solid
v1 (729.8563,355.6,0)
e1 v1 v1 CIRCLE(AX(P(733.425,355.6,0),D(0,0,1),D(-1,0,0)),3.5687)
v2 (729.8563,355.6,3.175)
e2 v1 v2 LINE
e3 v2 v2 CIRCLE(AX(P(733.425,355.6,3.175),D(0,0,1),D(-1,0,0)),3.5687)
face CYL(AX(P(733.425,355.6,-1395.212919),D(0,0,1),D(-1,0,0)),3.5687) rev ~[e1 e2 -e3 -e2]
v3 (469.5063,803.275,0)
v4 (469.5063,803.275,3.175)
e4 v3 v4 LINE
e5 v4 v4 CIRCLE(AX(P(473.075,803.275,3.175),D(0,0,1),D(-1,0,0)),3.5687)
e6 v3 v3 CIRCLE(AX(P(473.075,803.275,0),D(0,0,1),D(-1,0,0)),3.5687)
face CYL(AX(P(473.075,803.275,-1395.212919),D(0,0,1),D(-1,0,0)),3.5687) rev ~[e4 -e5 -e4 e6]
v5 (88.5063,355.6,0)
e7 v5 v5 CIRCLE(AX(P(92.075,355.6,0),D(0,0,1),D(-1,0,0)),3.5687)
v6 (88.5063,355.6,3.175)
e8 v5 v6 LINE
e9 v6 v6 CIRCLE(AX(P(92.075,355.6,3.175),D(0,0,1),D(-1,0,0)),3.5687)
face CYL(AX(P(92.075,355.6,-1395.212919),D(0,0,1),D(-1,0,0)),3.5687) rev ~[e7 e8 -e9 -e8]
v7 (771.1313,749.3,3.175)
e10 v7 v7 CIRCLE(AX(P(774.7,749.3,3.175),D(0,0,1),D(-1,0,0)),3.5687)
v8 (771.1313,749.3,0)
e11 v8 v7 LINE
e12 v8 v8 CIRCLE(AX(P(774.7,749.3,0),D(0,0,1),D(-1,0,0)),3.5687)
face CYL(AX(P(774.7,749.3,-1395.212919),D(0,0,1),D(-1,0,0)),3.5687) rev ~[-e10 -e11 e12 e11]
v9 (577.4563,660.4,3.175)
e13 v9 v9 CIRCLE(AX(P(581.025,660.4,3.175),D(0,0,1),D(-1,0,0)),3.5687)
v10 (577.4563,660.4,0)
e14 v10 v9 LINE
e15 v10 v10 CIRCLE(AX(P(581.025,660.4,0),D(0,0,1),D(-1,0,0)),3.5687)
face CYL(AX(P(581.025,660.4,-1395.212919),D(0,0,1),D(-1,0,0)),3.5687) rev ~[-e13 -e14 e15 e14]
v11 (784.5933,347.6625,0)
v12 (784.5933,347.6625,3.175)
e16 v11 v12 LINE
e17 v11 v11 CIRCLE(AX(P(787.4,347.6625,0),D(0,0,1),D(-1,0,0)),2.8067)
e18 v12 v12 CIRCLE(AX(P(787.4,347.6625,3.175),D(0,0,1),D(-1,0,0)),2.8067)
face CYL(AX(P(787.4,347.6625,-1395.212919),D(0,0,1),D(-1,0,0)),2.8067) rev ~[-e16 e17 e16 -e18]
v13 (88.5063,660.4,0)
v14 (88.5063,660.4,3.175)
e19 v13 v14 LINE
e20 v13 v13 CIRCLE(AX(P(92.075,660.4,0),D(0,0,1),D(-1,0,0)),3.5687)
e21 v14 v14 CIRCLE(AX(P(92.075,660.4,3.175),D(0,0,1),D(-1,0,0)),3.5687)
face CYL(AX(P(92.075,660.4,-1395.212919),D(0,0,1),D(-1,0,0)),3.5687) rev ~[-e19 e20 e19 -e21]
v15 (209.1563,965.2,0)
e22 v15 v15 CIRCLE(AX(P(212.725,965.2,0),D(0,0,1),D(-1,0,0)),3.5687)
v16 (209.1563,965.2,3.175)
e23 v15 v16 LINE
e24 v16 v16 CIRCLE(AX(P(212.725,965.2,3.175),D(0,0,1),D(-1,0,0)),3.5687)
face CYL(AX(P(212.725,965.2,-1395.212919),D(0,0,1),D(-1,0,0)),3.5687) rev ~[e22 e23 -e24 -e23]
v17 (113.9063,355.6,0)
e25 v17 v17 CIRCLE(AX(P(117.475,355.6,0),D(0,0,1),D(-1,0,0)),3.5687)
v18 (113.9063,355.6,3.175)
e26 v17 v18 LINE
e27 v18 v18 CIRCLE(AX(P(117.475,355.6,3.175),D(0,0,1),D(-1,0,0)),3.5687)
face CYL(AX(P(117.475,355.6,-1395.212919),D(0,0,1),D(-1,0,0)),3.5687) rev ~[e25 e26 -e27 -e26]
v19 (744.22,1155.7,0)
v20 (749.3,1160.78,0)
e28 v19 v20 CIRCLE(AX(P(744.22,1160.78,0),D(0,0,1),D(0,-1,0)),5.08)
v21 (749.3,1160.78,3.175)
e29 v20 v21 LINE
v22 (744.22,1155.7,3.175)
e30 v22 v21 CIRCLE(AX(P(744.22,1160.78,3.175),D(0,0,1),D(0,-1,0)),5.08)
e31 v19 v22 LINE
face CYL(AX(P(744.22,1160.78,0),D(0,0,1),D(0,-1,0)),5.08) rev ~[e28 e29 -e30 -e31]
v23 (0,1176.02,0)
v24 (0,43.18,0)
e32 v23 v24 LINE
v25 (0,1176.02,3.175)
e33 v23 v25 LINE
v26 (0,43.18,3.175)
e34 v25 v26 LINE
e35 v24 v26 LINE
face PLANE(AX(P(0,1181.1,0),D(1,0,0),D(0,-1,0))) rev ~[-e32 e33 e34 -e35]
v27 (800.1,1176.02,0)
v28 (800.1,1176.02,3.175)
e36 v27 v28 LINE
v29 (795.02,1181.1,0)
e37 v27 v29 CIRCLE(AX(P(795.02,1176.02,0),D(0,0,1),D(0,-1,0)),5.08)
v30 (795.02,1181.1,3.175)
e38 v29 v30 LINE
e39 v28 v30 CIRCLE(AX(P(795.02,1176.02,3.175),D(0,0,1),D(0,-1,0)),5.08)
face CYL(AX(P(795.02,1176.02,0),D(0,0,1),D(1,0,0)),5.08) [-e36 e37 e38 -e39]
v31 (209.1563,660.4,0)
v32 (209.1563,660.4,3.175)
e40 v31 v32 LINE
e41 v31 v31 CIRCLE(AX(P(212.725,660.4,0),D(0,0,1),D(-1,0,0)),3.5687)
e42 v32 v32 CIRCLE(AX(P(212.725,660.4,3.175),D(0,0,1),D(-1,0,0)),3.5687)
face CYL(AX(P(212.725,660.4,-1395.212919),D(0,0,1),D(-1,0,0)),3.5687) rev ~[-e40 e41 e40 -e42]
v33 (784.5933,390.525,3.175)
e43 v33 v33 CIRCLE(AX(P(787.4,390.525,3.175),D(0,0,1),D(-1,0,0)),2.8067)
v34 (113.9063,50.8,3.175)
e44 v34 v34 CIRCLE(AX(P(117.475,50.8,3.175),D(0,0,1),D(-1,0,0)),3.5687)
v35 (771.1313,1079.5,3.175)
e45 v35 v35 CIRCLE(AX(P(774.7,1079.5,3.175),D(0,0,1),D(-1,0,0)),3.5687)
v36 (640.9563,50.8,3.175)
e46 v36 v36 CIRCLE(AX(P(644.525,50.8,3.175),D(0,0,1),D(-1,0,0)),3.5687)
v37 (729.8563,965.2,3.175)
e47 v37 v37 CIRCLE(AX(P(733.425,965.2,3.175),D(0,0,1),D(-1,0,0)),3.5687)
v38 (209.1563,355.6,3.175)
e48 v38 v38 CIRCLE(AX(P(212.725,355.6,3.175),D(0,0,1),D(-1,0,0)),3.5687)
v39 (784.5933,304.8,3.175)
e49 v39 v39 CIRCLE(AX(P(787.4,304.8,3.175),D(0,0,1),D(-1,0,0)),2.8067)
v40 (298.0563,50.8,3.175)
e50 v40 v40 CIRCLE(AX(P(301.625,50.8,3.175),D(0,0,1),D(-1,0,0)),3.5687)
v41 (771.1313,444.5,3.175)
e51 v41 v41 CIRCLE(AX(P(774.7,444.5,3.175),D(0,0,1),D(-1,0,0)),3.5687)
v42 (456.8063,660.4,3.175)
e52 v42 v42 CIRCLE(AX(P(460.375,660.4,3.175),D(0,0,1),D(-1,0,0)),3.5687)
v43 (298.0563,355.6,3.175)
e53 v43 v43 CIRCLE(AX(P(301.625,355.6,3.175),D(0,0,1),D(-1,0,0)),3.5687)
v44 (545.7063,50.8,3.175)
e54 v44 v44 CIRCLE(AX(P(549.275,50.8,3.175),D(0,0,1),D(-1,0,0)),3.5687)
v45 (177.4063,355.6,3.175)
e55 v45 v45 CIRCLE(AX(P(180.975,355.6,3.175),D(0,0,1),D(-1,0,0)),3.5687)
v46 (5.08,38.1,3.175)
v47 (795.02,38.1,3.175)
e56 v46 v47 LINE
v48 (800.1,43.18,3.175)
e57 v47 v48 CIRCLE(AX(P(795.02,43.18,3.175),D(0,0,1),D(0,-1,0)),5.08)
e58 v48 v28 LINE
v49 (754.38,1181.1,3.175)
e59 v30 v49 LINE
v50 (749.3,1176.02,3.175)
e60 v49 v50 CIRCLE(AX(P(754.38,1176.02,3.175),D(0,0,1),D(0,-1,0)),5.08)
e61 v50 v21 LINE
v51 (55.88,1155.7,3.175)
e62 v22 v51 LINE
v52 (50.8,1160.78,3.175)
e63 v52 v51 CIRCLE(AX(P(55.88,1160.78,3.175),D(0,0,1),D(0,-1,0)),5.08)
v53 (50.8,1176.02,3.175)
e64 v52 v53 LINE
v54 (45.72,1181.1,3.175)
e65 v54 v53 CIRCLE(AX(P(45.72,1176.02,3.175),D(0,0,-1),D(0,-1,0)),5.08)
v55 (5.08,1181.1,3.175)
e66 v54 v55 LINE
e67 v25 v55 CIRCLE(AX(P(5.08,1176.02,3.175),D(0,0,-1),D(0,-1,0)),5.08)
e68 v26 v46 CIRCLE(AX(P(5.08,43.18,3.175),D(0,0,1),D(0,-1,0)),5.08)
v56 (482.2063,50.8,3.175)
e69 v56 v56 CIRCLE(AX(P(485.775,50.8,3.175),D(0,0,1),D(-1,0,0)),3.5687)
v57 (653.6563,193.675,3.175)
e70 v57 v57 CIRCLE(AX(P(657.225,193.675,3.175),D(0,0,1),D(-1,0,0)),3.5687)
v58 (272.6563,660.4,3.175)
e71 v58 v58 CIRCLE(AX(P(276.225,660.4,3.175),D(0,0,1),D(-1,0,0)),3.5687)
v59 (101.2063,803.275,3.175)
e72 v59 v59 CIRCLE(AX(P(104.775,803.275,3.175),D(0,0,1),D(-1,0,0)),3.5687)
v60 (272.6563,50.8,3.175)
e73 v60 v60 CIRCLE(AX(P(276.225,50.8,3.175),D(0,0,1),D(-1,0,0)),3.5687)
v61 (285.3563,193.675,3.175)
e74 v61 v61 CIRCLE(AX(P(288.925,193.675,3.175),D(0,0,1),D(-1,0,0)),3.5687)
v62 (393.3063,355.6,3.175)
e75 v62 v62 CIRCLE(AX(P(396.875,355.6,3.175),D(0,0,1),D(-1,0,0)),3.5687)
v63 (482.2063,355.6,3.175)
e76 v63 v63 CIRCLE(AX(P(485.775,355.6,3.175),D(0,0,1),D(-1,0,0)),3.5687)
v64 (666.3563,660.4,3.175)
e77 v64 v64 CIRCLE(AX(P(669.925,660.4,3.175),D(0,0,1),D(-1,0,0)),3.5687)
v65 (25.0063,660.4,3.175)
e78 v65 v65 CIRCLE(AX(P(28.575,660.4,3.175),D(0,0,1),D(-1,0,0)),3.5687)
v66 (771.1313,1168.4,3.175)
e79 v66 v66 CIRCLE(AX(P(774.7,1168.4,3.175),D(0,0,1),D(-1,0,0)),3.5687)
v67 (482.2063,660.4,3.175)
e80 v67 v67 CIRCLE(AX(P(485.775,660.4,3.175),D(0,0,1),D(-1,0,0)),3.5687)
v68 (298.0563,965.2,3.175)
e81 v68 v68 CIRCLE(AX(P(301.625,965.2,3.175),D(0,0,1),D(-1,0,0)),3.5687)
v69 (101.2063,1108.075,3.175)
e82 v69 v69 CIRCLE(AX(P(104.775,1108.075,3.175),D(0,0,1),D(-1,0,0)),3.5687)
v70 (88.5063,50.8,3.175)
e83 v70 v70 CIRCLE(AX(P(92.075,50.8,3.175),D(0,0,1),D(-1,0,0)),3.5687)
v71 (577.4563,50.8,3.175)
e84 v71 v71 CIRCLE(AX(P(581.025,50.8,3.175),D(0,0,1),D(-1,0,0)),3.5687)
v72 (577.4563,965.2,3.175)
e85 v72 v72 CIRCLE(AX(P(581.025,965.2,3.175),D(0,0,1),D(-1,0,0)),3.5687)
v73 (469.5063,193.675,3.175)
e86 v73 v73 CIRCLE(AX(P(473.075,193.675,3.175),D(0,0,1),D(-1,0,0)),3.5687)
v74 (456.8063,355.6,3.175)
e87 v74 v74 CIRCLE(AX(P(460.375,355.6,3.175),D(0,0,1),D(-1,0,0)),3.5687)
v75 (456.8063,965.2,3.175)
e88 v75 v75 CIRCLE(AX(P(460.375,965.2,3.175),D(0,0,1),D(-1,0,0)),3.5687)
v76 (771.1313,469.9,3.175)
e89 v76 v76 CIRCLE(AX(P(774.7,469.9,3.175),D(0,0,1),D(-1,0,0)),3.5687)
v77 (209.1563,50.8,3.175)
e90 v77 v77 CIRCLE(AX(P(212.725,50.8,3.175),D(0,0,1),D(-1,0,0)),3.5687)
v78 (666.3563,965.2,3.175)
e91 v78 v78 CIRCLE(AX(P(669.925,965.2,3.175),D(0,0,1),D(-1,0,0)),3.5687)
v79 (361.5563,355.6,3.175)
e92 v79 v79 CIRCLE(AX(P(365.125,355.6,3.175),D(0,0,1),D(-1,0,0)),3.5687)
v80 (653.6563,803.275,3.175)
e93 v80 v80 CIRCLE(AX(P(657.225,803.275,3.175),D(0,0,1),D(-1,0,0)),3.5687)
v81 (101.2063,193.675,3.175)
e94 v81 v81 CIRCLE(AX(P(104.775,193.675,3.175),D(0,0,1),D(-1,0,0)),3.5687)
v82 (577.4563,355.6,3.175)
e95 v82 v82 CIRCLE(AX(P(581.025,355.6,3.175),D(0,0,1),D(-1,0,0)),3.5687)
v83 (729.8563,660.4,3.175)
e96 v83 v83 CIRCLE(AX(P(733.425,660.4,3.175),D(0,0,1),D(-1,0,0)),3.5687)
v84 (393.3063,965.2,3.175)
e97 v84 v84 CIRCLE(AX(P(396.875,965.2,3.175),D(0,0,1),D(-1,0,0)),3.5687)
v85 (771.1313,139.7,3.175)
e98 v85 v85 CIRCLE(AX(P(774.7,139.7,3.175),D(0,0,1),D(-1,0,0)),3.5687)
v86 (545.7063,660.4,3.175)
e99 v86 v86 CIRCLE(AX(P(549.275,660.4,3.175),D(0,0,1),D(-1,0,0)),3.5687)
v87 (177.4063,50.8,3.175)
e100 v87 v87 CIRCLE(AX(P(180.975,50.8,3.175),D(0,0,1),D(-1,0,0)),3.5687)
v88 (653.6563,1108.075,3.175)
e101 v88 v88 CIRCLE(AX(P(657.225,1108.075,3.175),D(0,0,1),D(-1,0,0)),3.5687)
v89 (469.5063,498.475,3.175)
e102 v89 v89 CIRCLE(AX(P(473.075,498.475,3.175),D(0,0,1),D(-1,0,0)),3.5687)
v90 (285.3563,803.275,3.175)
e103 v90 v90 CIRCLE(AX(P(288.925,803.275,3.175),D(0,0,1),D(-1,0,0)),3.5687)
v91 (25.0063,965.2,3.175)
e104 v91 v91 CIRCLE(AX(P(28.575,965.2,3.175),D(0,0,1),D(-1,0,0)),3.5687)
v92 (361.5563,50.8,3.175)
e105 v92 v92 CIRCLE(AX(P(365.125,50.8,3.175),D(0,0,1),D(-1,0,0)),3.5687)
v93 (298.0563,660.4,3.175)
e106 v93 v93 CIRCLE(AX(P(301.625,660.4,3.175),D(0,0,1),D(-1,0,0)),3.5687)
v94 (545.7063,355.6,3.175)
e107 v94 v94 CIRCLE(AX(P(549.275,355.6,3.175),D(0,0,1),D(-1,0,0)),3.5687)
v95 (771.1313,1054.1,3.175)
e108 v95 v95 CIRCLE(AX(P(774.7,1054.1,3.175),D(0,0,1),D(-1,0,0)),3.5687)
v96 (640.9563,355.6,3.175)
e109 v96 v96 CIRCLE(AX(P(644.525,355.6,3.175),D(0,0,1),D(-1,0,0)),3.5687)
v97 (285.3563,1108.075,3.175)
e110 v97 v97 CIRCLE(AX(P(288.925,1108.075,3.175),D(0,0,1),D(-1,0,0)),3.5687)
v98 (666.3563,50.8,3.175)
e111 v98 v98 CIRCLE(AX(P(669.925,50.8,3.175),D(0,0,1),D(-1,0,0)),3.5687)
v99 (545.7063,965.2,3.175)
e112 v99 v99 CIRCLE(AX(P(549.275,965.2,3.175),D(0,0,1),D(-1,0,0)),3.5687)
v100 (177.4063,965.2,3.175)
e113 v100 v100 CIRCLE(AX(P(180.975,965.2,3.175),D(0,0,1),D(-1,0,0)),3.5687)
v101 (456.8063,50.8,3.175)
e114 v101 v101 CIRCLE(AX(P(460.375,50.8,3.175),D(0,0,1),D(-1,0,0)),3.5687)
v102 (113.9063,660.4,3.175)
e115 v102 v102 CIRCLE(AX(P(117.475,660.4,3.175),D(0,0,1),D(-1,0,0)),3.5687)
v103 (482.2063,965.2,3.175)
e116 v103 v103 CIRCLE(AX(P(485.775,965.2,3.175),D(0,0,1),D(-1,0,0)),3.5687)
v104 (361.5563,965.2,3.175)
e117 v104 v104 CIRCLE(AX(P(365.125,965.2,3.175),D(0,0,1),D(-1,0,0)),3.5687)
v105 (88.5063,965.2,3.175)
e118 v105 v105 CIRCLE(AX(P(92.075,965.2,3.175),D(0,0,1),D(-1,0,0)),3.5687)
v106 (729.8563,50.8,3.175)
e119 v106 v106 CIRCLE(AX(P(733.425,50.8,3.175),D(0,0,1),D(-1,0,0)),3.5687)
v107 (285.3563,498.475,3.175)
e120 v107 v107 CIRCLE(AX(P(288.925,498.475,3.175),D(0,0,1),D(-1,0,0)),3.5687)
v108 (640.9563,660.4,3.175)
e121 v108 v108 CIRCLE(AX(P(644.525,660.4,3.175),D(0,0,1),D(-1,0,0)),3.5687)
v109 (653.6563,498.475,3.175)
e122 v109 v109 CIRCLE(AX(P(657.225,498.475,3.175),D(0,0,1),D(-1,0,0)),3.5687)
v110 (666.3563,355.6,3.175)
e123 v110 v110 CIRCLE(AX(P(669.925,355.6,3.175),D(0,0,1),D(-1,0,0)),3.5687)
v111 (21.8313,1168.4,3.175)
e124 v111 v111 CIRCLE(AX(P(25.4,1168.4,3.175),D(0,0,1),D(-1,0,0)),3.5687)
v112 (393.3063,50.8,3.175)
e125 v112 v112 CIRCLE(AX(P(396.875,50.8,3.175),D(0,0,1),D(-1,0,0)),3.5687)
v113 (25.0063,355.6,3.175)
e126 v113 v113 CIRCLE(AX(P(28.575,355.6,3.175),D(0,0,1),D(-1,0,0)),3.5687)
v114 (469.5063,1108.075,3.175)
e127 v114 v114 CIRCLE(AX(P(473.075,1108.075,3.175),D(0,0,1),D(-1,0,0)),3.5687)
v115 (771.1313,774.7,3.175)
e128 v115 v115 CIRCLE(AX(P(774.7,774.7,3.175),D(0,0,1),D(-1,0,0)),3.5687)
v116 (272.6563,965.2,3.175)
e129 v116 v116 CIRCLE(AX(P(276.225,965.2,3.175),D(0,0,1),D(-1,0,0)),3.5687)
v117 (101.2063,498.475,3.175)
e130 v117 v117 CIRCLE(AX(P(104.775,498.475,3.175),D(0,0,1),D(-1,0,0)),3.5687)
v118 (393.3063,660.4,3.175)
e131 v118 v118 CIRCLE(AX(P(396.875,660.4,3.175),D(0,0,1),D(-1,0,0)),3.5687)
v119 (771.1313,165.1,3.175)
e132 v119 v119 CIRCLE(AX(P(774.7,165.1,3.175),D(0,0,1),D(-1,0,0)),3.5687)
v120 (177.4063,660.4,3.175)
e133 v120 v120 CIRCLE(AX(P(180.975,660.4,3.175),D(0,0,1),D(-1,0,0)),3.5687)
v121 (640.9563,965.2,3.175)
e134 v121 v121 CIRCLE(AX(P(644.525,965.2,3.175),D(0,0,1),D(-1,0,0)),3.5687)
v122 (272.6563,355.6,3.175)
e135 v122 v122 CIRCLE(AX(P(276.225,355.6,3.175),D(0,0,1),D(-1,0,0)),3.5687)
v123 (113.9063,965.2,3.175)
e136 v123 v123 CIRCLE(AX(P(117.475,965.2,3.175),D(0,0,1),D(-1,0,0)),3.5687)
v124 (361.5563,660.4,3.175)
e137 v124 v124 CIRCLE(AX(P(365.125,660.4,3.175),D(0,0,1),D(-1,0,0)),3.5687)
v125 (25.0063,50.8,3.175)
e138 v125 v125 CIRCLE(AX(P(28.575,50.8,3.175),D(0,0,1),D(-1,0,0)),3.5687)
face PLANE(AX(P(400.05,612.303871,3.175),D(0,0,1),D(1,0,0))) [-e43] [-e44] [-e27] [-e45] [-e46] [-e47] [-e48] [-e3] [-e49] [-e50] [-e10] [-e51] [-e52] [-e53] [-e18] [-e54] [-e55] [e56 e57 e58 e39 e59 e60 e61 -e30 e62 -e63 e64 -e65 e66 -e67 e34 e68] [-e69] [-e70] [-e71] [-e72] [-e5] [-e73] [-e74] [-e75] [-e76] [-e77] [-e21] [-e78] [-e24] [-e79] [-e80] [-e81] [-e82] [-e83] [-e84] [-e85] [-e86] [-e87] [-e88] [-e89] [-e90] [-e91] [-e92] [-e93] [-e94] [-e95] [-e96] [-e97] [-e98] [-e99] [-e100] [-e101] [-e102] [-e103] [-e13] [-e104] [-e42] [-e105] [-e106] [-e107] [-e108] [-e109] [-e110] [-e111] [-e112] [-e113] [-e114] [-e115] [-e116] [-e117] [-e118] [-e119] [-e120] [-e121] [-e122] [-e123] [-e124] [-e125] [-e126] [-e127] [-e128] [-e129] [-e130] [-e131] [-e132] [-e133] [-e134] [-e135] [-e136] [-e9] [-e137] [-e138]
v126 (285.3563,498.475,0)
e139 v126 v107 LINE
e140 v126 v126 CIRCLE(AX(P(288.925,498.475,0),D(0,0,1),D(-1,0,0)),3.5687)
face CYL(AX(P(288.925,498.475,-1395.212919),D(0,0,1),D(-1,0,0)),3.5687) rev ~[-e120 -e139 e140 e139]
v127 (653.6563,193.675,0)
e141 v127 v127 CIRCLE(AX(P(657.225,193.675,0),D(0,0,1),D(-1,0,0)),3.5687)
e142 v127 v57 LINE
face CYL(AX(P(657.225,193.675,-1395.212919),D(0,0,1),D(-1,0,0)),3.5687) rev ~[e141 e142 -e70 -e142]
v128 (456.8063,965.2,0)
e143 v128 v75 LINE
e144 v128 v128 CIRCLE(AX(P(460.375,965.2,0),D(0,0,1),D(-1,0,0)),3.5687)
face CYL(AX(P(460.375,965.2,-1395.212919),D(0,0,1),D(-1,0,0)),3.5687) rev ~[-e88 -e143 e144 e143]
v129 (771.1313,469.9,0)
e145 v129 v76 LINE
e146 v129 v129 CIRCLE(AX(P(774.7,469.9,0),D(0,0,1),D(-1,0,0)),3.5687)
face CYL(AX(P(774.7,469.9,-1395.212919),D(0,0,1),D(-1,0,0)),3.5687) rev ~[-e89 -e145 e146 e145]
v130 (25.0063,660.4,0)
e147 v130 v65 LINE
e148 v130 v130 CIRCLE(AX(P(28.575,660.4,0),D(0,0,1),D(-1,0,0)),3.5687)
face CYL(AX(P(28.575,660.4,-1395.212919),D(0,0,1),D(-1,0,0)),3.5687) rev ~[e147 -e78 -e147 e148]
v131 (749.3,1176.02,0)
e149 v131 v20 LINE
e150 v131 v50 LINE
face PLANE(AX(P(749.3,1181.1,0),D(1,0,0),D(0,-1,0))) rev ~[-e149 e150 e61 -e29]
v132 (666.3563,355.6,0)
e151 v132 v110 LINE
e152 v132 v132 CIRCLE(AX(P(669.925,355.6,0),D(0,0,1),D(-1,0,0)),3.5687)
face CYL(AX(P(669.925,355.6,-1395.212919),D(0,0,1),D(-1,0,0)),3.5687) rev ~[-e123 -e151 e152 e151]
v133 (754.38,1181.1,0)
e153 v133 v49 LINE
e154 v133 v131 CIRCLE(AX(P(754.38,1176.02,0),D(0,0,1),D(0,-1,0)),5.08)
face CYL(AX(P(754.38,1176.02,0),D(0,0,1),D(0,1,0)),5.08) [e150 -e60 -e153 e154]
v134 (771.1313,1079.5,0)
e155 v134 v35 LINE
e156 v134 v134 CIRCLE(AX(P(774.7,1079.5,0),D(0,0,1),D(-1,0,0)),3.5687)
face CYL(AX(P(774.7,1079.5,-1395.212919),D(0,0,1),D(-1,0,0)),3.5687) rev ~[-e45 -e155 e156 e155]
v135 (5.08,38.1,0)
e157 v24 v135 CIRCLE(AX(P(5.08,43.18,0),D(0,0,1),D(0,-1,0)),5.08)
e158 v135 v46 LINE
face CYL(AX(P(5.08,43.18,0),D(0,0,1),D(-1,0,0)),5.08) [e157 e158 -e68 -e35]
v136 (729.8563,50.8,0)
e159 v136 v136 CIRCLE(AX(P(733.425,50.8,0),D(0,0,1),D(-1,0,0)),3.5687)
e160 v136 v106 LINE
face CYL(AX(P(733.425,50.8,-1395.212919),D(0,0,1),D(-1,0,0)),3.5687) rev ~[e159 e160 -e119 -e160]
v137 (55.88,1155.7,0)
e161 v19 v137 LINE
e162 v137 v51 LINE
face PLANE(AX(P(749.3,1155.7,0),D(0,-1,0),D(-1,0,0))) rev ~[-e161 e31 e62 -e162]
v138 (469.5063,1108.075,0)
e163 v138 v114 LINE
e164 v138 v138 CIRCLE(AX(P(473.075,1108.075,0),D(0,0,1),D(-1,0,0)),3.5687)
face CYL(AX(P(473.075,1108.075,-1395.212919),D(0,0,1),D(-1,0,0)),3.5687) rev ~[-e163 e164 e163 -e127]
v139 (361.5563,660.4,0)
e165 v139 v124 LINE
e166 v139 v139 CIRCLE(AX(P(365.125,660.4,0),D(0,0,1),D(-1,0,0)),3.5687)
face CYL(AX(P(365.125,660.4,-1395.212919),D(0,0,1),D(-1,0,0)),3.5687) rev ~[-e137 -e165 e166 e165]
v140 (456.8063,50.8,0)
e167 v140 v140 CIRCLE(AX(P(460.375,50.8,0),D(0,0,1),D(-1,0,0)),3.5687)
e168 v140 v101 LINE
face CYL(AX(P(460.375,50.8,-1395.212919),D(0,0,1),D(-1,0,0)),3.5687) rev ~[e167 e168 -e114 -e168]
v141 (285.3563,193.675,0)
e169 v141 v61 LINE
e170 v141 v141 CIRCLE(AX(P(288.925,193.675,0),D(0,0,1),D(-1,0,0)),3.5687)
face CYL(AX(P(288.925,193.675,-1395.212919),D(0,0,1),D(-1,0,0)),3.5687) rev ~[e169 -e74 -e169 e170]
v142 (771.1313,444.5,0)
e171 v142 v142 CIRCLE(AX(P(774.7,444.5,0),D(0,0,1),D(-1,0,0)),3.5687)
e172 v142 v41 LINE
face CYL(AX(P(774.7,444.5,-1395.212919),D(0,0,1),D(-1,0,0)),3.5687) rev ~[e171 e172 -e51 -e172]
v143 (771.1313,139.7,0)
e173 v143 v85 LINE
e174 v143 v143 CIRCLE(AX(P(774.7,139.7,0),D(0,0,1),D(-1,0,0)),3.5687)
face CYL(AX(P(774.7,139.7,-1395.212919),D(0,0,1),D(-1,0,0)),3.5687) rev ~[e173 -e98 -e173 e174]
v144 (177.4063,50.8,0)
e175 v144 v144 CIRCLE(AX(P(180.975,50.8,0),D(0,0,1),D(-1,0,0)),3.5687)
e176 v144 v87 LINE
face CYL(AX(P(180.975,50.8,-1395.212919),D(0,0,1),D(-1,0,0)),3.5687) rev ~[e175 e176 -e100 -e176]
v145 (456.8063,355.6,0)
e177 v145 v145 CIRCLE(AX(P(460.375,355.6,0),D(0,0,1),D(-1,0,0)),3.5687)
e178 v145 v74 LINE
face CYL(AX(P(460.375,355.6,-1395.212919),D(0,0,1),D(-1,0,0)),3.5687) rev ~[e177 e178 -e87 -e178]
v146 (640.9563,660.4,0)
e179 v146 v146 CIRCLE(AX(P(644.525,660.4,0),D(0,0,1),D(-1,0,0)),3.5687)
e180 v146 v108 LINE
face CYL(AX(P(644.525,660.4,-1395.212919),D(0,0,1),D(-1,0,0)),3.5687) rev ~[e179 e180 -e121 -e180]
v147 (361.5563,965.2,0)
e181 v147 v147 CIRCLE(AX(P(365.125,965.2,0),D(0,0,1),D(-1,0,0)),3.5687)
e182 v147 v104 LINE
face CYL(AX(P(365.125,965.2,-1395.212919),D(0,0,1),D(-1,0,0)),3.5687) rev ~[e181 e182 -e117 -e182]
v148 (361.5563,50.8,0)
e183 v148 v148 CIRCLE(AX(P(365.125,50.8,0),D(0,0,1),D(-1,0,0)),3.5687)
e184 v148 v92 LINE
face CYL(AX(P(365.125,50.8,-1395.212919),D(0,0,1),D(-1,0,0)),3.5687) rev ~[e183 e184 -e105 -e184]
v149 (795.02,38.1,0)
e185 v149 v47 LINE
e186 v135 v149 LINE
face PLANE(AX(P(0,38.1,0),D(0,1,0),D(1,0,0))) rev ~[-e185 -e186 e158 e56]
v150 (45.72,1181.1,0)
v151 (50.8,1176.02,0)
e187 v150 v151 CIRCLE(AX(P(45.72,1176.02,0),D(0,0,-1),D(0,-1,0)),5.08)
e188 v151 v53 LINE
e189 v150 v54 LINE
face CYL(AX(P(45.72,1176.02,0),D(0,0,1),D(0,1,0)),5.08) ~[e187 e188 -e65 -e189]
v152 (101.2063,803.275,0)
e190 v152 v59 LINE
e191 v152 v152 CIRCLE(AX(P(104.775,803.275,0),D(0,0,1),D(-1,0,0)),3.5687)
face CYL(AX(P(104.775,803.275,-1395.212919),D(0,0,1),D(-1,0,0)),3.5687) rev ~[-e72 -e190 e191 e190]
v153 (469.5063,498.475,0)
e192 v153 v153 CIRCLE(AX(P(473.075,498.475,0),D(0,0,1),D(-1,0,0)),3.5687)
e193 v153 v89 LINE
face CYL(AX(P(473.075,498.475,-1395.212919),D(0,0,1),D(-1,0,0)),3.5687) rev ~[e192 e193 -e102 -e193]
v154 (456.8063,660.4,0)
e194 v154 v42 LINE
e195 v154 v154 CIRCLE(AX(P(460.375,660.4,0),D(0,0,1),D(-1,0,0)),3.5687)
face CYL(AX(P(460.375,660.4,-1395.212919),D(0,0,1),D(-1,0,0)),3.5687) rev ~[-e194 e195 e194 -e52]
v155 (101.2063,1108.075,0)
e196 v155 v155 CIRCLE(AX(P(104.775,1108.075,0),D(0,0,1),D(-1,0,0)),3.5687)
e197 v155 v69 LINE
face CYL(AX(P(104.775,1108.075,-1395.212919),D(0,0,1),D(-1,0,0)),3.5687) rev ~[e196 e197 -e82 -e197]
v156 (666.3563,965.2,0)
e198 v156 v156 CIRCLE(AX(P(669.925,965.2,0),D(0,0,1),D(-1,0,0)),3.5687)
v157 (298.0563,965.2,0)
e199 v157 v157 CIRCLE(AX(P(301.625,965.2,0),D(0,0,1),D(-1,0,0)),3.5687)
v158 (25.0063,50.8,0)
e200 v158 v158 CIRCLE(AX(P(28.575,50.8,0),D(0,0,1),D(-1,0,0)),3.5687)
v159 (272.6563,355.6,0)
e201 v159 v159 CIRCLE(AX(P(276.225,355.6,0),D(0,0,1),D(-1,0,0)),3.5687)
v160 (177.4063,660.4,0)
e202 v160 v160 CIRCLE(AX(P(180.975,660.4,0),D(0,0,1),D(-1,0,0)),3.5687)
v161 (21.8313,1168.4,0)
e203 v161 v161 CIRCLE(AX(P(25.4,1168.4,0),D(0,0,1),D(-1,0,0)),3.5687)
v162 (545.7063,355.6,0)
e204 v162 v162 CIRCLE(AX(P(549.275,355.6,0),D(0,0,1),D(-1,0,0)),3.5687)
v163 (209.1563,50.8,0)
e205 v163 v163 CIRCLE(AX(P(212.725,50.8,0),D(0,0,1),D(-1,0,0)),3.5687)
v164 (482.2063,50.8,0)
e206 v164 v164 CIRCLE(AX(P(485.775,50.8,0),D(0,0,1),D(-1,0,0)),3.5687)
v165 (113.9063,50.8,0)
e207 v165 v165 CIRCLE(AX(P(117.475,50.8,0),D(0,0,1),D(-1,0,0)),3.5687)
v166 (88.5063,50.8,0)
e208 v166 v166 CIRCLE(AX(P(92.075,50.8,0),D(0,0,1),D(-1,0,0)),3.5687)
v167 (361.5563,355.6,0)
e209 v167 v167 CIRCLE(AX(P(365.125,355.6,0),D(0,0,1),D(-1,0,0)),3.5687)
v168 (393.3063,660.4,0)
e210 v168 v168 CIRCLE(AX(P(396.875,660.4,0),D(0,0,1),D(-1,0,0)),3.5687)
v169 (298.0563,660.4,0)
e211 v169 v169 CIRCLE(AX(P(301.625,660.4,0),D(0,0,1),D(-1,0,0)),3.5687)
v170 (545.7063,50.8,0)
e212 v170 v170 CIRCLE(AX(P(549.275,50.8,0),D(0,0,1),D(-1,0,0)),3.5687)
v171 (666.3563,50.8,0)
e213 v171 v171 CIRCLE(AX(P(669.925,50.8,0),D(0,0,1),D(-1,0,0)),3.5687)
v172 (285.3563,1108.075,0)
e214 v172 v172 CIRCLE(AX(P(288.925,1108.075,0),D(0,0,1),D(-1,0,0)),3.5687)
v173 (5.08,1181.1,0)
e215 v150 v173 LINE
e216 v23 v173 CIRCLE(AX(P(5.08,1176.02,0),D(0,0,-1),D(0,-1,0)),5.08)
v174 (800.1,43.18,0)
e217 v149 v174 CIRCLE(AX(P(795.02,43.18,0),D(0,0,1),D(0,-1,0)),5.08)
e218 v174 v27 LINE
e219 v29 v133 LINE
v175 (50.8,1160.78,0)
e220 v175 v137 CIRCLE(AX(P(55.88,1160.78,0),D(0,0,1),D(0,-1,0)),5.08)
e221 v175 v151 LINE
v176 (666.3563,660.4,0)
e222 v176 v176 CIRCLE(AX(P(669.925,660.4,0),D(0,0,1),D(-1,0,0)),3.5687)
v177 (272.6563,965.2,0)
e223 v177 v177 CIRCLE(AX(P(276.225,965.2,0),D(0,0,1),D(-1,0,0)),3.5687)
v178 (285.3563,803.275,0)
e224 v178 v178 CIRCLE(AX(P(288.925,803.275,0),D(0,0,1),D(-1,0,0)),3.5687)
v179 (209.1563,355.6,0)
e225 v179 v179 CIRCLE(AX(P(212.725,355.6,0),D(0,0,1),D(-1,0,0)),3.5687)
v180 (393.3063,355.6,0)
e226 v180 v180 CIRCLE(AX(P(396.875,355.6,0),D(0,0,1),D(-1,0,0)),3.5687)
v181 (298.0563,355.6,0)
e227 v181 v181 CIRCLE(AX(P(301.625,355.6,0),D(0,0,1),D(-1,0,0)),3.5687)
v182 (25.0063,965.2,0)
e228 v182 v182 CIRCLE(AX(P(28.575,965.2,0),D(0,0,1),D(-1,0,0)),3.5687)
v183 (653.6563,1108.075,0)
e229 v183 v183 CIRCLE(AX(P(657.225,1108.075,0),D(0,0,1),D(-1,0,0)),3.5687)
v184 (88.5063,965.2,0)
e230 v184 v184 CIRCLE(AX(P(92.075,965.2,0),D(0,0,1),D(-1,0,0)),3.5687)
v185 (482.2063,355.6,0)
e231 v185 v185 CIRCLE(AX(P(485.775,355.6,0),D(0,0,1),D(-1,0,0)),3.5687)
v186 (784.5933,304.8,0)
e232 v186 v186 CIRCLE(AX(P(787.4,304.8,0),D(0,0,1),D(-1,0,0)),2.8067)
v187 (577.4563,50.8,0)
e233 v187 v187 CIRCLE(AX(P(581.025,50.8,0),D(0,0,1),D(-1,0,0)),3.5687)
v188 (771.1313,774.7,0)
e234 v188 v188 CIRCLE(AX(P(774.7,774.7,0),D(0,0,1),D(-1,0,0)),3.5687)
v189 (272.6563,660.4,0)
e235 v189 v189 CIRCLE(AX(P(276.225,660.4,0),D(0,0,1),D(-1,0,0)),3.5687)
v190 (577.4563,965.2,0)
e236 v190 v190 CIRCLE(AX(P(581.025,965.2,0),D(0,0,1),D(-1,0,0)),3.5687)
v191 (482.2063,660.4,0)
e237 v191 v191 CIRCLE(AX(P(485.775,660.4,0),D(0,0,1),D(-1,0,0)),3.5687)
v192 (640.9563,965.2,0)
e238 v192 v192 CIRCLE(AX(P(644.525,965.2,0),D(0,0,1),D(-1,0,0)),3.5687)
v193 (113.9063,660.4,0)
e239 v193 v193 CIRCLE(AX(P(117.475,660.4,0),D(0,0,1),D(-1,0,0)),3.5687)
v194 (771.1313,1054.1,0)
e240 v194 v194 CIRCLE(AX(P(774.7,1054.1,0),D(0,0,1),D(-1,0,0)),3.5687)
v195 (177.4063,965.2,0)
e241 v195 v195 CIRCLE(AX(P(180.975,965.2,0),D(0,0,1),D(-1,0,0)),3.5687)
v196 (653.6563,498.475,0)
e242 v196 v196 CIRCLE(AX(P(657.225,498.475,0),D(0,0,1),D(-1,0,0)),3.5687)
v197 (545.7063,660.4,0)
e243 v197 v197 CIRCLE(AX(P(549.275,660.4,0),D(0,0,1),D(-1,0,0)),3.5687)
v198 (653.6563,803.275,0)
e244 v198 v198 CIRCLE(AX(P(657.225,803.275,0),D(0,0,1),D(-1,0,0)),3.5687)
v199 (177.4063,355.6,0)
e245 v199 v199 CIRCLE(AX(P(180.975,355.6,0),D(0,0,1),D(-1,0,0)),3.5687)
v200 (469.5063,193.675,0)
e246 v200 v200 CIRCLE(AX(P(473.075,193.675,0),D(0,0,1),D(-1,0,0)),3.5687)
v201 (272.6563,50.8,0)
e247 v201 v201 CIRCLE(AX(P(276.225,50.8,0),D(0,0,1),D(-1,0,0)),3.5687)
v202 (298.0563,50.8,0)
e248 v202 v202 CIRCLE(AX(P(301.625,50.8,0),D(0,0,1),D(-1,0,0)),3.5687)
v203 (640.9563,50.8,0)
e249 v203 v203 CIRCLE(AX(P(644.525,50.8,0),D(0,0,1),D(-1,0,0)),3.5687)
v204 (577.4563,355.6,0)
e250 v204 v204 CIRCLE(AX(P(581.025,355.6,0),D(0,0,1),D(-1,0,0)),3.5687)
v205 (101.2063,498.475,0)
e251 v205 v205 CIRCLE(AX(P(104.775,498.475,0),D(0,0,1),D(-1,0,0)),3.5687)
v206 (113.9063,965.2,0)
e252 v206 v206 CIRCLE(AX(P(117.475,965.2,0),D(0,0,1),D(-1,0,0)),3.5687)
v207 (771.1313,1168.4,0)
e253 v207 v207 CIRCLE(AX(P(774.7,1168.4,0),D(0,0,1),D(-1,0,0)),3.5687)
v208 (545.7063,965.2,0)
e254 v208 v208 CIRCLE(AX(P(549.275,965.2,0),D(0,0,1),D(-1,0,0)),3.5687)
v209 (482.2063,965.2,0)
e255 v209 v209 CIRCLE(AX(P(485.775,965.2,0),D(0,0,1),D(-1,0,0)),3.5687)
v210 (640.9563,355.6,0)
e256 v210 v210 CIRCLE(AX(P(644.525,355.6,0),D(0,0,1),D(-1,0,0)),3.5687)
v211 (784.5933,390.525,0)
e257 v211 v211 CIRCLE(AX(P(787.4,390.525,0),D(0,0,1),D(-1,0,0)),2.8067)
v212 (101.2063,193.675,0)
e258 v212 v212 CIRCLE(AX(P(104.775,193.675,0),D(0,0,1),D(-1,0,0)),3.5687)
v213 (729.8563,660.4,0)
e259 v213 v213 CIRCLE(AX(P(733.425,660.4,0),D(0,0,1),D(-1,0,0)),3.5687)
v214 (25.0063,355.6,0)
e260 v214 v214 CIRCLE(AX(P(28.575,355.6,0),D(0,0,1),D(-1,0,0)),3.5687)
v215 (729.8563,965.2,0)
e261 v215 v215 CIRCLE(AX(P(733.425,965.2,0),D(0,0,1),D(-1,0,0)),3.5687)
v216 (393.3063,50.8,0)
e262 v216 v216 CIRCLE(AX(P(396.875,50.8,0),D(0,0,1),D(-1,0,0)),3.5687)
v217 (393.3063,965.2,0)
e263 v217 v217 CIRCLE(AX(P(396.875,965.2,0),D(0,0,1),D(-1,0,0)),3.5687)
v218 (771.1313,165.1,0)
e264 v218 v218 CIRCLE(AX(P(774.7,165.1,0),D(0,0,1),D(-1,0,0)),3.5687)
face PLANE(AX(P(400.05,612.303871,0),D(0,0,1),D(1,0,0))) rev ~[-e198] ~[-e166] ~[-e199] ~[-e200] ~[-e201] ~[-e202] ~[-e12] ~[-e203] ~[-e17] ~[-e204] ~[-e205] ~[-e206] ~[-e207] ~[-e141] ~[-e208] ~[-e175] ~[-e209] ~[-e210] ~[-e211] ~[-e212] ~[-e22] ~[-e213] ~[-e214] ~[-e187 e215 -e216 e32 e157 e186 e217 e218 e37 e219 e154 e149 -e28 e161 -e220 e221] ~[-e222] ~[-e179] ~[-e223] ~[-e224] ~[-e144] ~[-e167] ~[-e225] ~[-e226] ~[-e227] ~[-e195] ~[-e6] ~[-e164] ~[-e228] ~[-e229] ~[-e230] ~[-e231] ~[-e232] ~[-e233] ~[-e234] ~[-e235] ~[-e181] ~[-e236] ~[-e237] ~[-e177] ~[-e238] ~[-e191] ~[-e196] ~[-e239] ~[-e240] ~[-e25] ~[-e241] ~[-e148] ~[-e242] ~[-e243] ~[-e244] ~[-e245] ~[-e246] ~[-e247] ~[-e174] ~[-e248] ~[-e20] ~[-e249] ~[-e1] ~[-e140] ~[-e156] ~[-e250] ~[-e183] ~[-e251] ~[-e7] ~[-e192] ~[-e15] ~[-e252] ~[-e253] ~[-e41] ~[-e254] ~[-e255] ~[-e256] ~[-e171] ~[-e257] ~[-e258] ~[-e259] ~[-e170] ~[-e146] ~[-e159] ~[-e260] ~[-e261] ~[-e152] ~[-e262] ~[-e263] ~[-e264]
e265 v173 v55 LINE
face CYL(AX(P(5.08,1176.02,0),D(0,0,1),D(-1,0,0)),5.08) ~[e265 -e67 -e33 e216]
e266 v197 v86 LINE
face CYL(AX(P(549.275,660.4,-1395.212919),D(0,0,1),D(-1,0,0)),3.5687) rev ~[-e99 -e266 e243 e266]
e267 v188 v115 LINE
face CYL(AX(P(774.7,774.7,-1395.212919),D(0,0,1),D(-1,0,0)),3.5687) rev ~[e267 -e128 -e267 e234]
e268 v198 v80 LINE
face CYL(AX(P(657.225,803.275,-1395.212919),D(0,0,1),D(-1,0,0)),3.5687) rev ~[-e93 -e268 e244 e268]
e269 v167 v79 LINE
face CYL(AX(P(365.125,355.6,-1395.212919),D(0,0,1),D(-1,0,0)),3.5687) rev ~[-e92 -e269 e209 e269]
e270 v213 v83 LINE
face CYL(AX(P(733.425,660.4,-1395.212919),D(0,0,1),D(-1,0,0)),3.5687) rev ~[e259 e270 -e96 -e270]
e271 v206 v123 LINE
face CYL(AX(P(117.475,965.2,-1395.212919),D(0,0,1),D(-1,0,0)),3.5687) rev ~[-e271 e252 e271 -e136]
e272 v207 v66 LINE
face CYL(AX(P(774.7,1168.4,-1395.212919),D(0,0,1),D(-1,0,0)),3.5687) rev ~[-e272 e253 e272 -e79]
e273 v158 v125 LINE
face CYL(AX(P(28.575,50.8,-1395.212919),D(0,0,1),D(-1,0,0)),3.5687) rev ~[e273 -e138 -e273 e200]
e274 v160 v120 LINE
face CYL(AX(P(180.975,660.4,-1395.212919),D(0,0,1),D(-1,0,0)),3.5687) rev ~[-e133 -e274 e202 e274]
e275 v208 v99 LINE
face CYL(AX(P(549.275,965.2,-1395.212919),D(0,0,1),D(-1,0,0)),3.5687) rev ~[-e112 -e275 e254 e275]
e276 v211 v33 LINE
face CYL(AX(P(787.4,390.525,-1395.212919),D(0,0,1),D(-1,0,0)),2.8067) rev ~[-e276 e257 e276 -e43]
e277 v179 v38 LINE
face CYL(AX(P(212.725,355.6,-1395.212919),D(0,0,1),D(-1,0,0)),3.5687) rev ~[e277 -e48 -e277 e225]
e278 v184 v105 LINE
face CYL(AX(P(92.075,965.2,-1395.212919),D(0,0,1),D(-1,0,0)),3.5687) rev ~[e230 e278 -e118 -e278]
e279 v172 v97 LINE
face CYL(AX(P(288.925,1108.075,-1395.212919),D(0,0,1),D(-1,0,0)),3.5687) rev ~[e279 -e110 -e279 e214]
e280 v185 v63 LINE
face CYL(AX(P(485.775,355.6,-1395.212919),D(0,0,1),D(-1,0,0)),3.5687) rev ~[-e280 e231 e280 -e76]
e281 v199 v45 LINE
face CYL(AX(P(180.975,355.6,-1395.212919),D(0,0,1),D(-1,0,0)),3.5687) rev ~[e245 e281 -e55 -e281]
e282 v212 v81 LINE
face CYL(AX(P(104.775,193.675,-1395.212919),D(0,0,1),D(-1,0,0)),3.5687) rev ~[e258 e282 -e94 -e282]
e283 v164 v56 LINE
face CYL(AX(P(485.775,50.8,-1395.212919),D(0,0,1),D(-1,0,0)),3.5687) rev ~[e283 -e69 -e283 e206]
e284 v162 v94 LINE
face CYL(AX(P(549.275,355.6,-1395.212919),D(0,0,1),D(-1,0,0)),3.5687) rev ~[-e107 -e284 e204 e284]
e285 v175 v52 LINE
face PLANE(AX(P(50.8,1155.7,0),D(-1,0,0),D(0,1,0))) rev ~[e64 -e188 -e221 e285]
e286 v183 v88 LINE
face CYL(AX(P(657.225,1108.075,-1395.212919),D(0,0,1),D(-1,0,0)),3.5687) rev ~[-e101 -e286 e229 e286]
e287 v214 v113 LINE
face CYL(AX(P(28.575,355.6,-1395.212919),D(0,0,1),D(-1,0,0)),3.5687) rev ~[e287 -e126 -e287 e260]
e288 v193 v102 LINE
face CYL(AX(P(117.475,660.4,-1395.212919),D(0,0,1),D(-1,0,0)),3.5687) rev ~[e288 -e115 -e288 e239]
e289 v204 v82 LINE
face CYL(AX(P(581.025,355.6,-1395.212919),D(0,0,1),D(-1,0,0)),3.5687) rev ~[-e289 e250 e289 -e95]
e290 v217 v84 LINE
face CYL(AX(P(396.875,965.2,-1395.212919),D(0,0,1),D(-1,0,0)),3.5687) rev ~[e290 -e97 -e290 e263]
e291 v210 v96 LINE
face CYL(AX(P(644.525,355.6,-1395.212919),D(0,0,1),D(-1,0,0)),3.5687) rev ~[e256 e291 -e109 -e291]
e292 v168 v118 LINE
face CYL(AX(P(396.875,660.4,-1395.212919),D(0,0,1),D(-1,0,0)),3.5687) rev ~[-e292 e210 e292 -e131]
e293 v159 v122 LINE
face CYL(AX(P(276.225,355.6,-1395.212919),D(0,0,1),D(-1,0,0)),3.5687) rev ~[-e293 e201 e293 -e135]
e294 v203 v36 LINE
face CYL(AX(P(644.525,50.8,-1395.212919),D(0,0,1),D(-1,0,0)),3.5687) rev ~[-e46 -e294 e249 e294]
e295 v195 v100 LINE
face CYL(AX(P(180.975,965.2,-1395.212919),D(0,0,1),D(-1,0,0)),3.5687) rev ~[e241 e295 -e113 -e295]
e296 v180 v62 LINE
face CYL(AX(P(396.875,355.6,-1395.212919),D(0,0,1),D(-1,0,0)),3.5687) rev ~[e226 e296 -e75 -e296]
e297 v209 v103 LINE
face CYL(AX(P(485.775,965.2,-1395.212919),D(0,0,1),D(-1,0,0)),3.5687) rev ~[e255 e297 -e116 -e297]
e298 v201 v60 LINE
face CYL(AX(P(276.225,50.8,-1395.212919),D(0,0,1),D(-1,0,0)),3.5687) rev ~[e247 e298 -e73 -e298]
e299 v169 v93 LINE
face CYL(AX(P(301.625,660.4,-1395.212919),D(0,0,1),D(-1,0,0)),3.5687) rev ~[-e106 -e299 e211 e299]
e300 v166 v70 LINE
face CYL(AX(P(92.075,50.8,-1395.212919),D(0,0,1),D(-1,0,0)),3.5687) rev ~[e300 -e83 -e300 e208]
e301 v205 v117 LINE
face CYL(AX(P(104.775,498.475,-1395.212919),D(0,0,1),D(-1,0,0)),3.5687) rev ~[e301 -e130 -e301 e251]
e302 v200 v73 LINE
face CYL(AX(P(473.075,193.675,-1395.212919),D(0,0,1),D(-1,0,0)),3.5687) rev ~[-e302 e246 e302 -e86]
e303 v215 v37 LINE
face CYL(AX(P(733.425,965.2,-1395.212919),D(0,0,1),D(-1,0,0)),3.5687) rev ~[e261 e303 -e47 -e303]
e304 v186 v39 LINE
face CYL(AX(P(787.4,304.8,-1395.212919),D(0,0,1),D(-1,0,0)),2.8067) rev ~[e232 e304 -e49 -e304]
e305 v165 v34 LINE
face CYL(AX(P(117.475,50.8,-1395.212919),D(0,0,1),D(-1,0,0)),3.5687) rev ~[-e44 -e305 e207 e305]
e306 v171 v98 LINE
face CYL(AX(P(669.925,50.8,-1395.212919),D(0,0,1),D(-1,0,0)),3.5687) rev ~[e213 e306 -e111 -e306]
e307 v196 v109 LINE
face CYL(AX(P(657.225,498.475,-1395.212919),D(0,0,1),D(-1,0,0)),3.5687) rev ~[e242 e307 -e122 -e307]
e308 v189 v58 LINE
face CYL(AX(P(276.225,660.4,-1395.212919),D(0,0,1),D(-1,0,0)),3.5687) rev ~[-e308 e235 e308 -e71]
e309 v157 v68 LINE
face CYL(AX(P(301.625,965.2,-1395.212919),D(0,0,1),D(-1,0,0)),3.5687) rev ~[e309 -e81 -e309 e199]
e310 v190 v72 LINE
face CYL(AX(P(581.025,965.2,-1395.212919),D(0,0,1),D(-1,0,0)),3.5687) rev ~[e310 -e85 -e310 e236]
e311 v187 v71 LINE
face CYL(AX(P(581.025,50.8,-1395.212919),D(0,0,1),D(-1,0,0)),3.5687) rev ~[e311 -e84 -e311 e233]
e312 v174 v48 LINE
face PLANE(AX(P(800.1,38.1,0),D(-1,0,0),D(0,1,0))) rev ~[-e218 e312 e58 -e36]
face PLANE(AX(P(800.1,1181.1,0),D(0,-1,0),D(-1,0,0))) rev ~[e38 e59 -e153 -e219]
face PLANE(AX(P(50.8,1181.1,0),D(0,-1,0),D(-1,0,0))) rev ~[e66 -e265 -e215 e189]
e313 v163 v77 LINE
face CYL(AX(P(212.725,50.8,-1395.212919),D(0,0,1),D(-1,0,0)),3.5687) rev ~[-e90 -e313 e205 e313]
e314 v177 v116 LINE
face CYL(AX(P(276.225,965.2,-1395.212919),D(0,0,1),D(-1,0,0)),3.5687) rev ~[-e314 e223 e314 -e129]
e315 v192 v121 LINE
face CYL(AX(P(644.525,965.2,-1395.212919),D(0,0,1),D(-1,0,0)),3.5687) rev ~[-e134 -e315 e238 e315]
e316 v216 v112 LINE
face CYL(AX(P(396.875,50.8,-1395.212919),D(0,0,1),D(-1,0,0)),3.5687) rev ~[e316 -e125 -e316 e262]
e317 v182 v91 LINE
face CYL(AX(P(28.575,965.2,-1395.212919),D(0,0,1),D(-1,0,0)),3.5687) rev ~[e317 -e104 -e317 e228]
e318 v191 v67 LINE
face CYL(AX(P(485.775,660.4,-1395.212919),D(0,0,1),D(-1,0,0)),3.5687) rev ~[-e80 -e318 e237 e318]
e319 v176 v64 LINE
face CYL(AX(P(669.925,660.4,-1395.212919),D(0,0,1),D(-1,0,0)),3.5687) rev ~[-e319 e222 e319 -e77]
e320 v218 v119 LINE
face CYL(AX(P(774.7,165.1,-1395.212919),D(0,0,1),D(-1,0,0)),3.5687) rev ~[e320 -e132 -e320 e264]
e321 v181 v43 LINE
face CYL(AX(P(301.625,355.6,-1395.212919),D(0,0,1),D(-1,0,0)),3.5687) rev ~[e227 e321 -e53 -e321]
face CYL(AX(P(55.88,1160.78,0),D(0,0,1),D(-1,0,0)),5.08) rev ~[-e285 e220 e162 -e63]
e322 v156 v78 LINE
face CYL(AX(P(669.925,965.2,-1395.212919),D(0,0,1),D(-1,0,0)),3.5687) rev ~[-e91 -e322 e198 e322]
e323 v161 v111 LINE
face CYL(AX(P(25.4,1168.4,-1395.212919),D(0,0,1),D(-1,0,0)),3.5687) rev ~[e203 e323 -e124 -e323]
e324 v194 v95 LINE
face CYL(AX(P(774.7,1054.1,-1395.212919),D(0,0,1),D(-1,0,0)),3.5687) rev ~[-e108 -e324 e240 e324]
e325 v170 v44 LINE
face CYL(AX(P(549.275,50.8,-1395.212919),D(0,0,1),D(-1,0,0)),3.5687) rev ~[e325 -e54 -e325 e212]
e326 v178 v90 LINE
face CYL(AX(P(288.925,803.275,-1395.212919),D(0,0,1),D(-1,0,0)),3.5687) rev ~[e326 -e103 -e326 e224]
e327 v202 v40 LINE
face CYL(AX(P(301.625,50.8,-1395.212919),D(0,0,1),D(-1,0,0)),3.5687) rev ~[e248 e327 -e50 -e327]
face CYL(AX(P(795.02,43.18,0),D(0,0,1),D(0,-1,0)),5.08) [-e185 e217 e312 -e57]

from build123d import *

# Parameters (mm, degrees)
F1_DEPTH = 3.175
F2_D     = 7.1374
F3_R     = 5.08
F4_D     = 5.6134


# Not quite as in the source:
# - a feature names something its author has since deleted; it is built from what else it names


with BuildPart() as f1:
    # F0 (on Top) → F1 (new body)
    with BuildSketch(Plane.XY):
        Polygon((0, 1181.1), (0, 38.1), (800.1, 38.1), (800.1, 1181.1), (749.3, 1181.1), (749.3, 1155.7), (50.8, 1155.7), (50.8, 1181.1), align=None)
    extrude(amount=F1_DEPTH)

    # F2 (through all)
    with Locations(Plane(origin=(0, 0, 0), x_dir=(1, 0, 0), z_dir=(0, 0, -1))):
        with Locations((25.4, -1168.4), (92.075, -965.2), (117.475, -965.2), (276.225, -965.2), (301.625, -965.2), (460.375, -965.2), (485.775, -965.2), (644.525, -965.2), (669.925, -965.2), (774.7, -1168.4), (669.925, -660.4), (644.525, -660.4), (485.775, -660.4), (460.375, -660.4), (301.625, -660.4), (276.225, -660.4), (117.475, -660.4), (92.075, -660.4), (92.075, -355.6), (117.475, -355.6), (276.225, -355.6), (301.625, -355.6), (460.375, -355.6), (485.775, -355.6), (644.525, -355.6), (669.925, -355.6), (669.925, -50.8), (644.525, -50.8), (485.775, -50.8), (460.375, -50.8), (301.625, -50.8), (276.225, -50.8), (117.475, -50.8), (92.075, -50.8), (774.7, -1079.5), (774.7, -1054.1), (774.7, -774.7), (774.7, -749.3), (774.7, -469.9), (774.7, -444.5), (774.7, -165.1), (774.7, -139.7), (180.975, -965.2), (28.575, -965.2), (212.725, -965.2), (104.775, -1108.075), (288.925, -1108.075), (365.125, -965.2), (396.875, -965.2), (473.075, -1108.075), (549.275, -965.2), (581.025, -965.2), (657.225, -1108.075), (733.425, -965.2), (657.225, -803.275), (473.075, -803.275), (288.925, -803.275), (104.775, -803.275), (28.575, -660.4), (180.975, -660.4), (212.725, -660.4), (365.125, -660.4), (396.875, -660.4), (549.275, -660.4), (581.025, -660.4), (733.425, -660.4), (657.225, -498.475), (473.075, -498.475), (288.925, -498.475), (104.775, -498.475), (28.575, -355.6), (180.975, -355.6), (212.725, -355.6), (365.125, -355.6), (396.875, -355.6), (549.275, -355.6), (581.025, -355.6), (733.425, -355.6), (104.775, -193.675), (288.925, -193.675), (473.075, -193.675), (657.225, -193.675), (733.425, -50.8), (581.025, -50.8), (549.275, -50.8), (396.875, -50.8), (365.125, -50.8), (212.725, -50.8), (180.975, -50.8), (28.575, -50.8)):
            Hole(F2_D / 2)

    # F3
    f3_edges = [f1.edges().sort_by_distance(p)[0] for p in [
        (0, 1181.1, 1.5875),
        (800.1, 1181.1, 1.5875),
        (800.1, 38.1, 1.5875),
        (0, 38.1, 1.5875),
        (50.8, 1181.1, 1.5875),
        (50.8, 1155.7, 1.5875),
        (749.3, 1155.7, 1.5875),
        (749.3, 1181.1, 1.5875),
    ]]
    fillet(f3_edges, radius=F3_R)

    # F4 (through all)
    with Locations(Plane(origin=(0, 0, 0), x_dir=(1, 0, 0), z_dir=(0, 0, -1))):
        with Locations((787.4, -390.525), (787.4, -347.6625), (787.4, -304.8)):
            Hole(F4_D / 2)


solid = f1.part
